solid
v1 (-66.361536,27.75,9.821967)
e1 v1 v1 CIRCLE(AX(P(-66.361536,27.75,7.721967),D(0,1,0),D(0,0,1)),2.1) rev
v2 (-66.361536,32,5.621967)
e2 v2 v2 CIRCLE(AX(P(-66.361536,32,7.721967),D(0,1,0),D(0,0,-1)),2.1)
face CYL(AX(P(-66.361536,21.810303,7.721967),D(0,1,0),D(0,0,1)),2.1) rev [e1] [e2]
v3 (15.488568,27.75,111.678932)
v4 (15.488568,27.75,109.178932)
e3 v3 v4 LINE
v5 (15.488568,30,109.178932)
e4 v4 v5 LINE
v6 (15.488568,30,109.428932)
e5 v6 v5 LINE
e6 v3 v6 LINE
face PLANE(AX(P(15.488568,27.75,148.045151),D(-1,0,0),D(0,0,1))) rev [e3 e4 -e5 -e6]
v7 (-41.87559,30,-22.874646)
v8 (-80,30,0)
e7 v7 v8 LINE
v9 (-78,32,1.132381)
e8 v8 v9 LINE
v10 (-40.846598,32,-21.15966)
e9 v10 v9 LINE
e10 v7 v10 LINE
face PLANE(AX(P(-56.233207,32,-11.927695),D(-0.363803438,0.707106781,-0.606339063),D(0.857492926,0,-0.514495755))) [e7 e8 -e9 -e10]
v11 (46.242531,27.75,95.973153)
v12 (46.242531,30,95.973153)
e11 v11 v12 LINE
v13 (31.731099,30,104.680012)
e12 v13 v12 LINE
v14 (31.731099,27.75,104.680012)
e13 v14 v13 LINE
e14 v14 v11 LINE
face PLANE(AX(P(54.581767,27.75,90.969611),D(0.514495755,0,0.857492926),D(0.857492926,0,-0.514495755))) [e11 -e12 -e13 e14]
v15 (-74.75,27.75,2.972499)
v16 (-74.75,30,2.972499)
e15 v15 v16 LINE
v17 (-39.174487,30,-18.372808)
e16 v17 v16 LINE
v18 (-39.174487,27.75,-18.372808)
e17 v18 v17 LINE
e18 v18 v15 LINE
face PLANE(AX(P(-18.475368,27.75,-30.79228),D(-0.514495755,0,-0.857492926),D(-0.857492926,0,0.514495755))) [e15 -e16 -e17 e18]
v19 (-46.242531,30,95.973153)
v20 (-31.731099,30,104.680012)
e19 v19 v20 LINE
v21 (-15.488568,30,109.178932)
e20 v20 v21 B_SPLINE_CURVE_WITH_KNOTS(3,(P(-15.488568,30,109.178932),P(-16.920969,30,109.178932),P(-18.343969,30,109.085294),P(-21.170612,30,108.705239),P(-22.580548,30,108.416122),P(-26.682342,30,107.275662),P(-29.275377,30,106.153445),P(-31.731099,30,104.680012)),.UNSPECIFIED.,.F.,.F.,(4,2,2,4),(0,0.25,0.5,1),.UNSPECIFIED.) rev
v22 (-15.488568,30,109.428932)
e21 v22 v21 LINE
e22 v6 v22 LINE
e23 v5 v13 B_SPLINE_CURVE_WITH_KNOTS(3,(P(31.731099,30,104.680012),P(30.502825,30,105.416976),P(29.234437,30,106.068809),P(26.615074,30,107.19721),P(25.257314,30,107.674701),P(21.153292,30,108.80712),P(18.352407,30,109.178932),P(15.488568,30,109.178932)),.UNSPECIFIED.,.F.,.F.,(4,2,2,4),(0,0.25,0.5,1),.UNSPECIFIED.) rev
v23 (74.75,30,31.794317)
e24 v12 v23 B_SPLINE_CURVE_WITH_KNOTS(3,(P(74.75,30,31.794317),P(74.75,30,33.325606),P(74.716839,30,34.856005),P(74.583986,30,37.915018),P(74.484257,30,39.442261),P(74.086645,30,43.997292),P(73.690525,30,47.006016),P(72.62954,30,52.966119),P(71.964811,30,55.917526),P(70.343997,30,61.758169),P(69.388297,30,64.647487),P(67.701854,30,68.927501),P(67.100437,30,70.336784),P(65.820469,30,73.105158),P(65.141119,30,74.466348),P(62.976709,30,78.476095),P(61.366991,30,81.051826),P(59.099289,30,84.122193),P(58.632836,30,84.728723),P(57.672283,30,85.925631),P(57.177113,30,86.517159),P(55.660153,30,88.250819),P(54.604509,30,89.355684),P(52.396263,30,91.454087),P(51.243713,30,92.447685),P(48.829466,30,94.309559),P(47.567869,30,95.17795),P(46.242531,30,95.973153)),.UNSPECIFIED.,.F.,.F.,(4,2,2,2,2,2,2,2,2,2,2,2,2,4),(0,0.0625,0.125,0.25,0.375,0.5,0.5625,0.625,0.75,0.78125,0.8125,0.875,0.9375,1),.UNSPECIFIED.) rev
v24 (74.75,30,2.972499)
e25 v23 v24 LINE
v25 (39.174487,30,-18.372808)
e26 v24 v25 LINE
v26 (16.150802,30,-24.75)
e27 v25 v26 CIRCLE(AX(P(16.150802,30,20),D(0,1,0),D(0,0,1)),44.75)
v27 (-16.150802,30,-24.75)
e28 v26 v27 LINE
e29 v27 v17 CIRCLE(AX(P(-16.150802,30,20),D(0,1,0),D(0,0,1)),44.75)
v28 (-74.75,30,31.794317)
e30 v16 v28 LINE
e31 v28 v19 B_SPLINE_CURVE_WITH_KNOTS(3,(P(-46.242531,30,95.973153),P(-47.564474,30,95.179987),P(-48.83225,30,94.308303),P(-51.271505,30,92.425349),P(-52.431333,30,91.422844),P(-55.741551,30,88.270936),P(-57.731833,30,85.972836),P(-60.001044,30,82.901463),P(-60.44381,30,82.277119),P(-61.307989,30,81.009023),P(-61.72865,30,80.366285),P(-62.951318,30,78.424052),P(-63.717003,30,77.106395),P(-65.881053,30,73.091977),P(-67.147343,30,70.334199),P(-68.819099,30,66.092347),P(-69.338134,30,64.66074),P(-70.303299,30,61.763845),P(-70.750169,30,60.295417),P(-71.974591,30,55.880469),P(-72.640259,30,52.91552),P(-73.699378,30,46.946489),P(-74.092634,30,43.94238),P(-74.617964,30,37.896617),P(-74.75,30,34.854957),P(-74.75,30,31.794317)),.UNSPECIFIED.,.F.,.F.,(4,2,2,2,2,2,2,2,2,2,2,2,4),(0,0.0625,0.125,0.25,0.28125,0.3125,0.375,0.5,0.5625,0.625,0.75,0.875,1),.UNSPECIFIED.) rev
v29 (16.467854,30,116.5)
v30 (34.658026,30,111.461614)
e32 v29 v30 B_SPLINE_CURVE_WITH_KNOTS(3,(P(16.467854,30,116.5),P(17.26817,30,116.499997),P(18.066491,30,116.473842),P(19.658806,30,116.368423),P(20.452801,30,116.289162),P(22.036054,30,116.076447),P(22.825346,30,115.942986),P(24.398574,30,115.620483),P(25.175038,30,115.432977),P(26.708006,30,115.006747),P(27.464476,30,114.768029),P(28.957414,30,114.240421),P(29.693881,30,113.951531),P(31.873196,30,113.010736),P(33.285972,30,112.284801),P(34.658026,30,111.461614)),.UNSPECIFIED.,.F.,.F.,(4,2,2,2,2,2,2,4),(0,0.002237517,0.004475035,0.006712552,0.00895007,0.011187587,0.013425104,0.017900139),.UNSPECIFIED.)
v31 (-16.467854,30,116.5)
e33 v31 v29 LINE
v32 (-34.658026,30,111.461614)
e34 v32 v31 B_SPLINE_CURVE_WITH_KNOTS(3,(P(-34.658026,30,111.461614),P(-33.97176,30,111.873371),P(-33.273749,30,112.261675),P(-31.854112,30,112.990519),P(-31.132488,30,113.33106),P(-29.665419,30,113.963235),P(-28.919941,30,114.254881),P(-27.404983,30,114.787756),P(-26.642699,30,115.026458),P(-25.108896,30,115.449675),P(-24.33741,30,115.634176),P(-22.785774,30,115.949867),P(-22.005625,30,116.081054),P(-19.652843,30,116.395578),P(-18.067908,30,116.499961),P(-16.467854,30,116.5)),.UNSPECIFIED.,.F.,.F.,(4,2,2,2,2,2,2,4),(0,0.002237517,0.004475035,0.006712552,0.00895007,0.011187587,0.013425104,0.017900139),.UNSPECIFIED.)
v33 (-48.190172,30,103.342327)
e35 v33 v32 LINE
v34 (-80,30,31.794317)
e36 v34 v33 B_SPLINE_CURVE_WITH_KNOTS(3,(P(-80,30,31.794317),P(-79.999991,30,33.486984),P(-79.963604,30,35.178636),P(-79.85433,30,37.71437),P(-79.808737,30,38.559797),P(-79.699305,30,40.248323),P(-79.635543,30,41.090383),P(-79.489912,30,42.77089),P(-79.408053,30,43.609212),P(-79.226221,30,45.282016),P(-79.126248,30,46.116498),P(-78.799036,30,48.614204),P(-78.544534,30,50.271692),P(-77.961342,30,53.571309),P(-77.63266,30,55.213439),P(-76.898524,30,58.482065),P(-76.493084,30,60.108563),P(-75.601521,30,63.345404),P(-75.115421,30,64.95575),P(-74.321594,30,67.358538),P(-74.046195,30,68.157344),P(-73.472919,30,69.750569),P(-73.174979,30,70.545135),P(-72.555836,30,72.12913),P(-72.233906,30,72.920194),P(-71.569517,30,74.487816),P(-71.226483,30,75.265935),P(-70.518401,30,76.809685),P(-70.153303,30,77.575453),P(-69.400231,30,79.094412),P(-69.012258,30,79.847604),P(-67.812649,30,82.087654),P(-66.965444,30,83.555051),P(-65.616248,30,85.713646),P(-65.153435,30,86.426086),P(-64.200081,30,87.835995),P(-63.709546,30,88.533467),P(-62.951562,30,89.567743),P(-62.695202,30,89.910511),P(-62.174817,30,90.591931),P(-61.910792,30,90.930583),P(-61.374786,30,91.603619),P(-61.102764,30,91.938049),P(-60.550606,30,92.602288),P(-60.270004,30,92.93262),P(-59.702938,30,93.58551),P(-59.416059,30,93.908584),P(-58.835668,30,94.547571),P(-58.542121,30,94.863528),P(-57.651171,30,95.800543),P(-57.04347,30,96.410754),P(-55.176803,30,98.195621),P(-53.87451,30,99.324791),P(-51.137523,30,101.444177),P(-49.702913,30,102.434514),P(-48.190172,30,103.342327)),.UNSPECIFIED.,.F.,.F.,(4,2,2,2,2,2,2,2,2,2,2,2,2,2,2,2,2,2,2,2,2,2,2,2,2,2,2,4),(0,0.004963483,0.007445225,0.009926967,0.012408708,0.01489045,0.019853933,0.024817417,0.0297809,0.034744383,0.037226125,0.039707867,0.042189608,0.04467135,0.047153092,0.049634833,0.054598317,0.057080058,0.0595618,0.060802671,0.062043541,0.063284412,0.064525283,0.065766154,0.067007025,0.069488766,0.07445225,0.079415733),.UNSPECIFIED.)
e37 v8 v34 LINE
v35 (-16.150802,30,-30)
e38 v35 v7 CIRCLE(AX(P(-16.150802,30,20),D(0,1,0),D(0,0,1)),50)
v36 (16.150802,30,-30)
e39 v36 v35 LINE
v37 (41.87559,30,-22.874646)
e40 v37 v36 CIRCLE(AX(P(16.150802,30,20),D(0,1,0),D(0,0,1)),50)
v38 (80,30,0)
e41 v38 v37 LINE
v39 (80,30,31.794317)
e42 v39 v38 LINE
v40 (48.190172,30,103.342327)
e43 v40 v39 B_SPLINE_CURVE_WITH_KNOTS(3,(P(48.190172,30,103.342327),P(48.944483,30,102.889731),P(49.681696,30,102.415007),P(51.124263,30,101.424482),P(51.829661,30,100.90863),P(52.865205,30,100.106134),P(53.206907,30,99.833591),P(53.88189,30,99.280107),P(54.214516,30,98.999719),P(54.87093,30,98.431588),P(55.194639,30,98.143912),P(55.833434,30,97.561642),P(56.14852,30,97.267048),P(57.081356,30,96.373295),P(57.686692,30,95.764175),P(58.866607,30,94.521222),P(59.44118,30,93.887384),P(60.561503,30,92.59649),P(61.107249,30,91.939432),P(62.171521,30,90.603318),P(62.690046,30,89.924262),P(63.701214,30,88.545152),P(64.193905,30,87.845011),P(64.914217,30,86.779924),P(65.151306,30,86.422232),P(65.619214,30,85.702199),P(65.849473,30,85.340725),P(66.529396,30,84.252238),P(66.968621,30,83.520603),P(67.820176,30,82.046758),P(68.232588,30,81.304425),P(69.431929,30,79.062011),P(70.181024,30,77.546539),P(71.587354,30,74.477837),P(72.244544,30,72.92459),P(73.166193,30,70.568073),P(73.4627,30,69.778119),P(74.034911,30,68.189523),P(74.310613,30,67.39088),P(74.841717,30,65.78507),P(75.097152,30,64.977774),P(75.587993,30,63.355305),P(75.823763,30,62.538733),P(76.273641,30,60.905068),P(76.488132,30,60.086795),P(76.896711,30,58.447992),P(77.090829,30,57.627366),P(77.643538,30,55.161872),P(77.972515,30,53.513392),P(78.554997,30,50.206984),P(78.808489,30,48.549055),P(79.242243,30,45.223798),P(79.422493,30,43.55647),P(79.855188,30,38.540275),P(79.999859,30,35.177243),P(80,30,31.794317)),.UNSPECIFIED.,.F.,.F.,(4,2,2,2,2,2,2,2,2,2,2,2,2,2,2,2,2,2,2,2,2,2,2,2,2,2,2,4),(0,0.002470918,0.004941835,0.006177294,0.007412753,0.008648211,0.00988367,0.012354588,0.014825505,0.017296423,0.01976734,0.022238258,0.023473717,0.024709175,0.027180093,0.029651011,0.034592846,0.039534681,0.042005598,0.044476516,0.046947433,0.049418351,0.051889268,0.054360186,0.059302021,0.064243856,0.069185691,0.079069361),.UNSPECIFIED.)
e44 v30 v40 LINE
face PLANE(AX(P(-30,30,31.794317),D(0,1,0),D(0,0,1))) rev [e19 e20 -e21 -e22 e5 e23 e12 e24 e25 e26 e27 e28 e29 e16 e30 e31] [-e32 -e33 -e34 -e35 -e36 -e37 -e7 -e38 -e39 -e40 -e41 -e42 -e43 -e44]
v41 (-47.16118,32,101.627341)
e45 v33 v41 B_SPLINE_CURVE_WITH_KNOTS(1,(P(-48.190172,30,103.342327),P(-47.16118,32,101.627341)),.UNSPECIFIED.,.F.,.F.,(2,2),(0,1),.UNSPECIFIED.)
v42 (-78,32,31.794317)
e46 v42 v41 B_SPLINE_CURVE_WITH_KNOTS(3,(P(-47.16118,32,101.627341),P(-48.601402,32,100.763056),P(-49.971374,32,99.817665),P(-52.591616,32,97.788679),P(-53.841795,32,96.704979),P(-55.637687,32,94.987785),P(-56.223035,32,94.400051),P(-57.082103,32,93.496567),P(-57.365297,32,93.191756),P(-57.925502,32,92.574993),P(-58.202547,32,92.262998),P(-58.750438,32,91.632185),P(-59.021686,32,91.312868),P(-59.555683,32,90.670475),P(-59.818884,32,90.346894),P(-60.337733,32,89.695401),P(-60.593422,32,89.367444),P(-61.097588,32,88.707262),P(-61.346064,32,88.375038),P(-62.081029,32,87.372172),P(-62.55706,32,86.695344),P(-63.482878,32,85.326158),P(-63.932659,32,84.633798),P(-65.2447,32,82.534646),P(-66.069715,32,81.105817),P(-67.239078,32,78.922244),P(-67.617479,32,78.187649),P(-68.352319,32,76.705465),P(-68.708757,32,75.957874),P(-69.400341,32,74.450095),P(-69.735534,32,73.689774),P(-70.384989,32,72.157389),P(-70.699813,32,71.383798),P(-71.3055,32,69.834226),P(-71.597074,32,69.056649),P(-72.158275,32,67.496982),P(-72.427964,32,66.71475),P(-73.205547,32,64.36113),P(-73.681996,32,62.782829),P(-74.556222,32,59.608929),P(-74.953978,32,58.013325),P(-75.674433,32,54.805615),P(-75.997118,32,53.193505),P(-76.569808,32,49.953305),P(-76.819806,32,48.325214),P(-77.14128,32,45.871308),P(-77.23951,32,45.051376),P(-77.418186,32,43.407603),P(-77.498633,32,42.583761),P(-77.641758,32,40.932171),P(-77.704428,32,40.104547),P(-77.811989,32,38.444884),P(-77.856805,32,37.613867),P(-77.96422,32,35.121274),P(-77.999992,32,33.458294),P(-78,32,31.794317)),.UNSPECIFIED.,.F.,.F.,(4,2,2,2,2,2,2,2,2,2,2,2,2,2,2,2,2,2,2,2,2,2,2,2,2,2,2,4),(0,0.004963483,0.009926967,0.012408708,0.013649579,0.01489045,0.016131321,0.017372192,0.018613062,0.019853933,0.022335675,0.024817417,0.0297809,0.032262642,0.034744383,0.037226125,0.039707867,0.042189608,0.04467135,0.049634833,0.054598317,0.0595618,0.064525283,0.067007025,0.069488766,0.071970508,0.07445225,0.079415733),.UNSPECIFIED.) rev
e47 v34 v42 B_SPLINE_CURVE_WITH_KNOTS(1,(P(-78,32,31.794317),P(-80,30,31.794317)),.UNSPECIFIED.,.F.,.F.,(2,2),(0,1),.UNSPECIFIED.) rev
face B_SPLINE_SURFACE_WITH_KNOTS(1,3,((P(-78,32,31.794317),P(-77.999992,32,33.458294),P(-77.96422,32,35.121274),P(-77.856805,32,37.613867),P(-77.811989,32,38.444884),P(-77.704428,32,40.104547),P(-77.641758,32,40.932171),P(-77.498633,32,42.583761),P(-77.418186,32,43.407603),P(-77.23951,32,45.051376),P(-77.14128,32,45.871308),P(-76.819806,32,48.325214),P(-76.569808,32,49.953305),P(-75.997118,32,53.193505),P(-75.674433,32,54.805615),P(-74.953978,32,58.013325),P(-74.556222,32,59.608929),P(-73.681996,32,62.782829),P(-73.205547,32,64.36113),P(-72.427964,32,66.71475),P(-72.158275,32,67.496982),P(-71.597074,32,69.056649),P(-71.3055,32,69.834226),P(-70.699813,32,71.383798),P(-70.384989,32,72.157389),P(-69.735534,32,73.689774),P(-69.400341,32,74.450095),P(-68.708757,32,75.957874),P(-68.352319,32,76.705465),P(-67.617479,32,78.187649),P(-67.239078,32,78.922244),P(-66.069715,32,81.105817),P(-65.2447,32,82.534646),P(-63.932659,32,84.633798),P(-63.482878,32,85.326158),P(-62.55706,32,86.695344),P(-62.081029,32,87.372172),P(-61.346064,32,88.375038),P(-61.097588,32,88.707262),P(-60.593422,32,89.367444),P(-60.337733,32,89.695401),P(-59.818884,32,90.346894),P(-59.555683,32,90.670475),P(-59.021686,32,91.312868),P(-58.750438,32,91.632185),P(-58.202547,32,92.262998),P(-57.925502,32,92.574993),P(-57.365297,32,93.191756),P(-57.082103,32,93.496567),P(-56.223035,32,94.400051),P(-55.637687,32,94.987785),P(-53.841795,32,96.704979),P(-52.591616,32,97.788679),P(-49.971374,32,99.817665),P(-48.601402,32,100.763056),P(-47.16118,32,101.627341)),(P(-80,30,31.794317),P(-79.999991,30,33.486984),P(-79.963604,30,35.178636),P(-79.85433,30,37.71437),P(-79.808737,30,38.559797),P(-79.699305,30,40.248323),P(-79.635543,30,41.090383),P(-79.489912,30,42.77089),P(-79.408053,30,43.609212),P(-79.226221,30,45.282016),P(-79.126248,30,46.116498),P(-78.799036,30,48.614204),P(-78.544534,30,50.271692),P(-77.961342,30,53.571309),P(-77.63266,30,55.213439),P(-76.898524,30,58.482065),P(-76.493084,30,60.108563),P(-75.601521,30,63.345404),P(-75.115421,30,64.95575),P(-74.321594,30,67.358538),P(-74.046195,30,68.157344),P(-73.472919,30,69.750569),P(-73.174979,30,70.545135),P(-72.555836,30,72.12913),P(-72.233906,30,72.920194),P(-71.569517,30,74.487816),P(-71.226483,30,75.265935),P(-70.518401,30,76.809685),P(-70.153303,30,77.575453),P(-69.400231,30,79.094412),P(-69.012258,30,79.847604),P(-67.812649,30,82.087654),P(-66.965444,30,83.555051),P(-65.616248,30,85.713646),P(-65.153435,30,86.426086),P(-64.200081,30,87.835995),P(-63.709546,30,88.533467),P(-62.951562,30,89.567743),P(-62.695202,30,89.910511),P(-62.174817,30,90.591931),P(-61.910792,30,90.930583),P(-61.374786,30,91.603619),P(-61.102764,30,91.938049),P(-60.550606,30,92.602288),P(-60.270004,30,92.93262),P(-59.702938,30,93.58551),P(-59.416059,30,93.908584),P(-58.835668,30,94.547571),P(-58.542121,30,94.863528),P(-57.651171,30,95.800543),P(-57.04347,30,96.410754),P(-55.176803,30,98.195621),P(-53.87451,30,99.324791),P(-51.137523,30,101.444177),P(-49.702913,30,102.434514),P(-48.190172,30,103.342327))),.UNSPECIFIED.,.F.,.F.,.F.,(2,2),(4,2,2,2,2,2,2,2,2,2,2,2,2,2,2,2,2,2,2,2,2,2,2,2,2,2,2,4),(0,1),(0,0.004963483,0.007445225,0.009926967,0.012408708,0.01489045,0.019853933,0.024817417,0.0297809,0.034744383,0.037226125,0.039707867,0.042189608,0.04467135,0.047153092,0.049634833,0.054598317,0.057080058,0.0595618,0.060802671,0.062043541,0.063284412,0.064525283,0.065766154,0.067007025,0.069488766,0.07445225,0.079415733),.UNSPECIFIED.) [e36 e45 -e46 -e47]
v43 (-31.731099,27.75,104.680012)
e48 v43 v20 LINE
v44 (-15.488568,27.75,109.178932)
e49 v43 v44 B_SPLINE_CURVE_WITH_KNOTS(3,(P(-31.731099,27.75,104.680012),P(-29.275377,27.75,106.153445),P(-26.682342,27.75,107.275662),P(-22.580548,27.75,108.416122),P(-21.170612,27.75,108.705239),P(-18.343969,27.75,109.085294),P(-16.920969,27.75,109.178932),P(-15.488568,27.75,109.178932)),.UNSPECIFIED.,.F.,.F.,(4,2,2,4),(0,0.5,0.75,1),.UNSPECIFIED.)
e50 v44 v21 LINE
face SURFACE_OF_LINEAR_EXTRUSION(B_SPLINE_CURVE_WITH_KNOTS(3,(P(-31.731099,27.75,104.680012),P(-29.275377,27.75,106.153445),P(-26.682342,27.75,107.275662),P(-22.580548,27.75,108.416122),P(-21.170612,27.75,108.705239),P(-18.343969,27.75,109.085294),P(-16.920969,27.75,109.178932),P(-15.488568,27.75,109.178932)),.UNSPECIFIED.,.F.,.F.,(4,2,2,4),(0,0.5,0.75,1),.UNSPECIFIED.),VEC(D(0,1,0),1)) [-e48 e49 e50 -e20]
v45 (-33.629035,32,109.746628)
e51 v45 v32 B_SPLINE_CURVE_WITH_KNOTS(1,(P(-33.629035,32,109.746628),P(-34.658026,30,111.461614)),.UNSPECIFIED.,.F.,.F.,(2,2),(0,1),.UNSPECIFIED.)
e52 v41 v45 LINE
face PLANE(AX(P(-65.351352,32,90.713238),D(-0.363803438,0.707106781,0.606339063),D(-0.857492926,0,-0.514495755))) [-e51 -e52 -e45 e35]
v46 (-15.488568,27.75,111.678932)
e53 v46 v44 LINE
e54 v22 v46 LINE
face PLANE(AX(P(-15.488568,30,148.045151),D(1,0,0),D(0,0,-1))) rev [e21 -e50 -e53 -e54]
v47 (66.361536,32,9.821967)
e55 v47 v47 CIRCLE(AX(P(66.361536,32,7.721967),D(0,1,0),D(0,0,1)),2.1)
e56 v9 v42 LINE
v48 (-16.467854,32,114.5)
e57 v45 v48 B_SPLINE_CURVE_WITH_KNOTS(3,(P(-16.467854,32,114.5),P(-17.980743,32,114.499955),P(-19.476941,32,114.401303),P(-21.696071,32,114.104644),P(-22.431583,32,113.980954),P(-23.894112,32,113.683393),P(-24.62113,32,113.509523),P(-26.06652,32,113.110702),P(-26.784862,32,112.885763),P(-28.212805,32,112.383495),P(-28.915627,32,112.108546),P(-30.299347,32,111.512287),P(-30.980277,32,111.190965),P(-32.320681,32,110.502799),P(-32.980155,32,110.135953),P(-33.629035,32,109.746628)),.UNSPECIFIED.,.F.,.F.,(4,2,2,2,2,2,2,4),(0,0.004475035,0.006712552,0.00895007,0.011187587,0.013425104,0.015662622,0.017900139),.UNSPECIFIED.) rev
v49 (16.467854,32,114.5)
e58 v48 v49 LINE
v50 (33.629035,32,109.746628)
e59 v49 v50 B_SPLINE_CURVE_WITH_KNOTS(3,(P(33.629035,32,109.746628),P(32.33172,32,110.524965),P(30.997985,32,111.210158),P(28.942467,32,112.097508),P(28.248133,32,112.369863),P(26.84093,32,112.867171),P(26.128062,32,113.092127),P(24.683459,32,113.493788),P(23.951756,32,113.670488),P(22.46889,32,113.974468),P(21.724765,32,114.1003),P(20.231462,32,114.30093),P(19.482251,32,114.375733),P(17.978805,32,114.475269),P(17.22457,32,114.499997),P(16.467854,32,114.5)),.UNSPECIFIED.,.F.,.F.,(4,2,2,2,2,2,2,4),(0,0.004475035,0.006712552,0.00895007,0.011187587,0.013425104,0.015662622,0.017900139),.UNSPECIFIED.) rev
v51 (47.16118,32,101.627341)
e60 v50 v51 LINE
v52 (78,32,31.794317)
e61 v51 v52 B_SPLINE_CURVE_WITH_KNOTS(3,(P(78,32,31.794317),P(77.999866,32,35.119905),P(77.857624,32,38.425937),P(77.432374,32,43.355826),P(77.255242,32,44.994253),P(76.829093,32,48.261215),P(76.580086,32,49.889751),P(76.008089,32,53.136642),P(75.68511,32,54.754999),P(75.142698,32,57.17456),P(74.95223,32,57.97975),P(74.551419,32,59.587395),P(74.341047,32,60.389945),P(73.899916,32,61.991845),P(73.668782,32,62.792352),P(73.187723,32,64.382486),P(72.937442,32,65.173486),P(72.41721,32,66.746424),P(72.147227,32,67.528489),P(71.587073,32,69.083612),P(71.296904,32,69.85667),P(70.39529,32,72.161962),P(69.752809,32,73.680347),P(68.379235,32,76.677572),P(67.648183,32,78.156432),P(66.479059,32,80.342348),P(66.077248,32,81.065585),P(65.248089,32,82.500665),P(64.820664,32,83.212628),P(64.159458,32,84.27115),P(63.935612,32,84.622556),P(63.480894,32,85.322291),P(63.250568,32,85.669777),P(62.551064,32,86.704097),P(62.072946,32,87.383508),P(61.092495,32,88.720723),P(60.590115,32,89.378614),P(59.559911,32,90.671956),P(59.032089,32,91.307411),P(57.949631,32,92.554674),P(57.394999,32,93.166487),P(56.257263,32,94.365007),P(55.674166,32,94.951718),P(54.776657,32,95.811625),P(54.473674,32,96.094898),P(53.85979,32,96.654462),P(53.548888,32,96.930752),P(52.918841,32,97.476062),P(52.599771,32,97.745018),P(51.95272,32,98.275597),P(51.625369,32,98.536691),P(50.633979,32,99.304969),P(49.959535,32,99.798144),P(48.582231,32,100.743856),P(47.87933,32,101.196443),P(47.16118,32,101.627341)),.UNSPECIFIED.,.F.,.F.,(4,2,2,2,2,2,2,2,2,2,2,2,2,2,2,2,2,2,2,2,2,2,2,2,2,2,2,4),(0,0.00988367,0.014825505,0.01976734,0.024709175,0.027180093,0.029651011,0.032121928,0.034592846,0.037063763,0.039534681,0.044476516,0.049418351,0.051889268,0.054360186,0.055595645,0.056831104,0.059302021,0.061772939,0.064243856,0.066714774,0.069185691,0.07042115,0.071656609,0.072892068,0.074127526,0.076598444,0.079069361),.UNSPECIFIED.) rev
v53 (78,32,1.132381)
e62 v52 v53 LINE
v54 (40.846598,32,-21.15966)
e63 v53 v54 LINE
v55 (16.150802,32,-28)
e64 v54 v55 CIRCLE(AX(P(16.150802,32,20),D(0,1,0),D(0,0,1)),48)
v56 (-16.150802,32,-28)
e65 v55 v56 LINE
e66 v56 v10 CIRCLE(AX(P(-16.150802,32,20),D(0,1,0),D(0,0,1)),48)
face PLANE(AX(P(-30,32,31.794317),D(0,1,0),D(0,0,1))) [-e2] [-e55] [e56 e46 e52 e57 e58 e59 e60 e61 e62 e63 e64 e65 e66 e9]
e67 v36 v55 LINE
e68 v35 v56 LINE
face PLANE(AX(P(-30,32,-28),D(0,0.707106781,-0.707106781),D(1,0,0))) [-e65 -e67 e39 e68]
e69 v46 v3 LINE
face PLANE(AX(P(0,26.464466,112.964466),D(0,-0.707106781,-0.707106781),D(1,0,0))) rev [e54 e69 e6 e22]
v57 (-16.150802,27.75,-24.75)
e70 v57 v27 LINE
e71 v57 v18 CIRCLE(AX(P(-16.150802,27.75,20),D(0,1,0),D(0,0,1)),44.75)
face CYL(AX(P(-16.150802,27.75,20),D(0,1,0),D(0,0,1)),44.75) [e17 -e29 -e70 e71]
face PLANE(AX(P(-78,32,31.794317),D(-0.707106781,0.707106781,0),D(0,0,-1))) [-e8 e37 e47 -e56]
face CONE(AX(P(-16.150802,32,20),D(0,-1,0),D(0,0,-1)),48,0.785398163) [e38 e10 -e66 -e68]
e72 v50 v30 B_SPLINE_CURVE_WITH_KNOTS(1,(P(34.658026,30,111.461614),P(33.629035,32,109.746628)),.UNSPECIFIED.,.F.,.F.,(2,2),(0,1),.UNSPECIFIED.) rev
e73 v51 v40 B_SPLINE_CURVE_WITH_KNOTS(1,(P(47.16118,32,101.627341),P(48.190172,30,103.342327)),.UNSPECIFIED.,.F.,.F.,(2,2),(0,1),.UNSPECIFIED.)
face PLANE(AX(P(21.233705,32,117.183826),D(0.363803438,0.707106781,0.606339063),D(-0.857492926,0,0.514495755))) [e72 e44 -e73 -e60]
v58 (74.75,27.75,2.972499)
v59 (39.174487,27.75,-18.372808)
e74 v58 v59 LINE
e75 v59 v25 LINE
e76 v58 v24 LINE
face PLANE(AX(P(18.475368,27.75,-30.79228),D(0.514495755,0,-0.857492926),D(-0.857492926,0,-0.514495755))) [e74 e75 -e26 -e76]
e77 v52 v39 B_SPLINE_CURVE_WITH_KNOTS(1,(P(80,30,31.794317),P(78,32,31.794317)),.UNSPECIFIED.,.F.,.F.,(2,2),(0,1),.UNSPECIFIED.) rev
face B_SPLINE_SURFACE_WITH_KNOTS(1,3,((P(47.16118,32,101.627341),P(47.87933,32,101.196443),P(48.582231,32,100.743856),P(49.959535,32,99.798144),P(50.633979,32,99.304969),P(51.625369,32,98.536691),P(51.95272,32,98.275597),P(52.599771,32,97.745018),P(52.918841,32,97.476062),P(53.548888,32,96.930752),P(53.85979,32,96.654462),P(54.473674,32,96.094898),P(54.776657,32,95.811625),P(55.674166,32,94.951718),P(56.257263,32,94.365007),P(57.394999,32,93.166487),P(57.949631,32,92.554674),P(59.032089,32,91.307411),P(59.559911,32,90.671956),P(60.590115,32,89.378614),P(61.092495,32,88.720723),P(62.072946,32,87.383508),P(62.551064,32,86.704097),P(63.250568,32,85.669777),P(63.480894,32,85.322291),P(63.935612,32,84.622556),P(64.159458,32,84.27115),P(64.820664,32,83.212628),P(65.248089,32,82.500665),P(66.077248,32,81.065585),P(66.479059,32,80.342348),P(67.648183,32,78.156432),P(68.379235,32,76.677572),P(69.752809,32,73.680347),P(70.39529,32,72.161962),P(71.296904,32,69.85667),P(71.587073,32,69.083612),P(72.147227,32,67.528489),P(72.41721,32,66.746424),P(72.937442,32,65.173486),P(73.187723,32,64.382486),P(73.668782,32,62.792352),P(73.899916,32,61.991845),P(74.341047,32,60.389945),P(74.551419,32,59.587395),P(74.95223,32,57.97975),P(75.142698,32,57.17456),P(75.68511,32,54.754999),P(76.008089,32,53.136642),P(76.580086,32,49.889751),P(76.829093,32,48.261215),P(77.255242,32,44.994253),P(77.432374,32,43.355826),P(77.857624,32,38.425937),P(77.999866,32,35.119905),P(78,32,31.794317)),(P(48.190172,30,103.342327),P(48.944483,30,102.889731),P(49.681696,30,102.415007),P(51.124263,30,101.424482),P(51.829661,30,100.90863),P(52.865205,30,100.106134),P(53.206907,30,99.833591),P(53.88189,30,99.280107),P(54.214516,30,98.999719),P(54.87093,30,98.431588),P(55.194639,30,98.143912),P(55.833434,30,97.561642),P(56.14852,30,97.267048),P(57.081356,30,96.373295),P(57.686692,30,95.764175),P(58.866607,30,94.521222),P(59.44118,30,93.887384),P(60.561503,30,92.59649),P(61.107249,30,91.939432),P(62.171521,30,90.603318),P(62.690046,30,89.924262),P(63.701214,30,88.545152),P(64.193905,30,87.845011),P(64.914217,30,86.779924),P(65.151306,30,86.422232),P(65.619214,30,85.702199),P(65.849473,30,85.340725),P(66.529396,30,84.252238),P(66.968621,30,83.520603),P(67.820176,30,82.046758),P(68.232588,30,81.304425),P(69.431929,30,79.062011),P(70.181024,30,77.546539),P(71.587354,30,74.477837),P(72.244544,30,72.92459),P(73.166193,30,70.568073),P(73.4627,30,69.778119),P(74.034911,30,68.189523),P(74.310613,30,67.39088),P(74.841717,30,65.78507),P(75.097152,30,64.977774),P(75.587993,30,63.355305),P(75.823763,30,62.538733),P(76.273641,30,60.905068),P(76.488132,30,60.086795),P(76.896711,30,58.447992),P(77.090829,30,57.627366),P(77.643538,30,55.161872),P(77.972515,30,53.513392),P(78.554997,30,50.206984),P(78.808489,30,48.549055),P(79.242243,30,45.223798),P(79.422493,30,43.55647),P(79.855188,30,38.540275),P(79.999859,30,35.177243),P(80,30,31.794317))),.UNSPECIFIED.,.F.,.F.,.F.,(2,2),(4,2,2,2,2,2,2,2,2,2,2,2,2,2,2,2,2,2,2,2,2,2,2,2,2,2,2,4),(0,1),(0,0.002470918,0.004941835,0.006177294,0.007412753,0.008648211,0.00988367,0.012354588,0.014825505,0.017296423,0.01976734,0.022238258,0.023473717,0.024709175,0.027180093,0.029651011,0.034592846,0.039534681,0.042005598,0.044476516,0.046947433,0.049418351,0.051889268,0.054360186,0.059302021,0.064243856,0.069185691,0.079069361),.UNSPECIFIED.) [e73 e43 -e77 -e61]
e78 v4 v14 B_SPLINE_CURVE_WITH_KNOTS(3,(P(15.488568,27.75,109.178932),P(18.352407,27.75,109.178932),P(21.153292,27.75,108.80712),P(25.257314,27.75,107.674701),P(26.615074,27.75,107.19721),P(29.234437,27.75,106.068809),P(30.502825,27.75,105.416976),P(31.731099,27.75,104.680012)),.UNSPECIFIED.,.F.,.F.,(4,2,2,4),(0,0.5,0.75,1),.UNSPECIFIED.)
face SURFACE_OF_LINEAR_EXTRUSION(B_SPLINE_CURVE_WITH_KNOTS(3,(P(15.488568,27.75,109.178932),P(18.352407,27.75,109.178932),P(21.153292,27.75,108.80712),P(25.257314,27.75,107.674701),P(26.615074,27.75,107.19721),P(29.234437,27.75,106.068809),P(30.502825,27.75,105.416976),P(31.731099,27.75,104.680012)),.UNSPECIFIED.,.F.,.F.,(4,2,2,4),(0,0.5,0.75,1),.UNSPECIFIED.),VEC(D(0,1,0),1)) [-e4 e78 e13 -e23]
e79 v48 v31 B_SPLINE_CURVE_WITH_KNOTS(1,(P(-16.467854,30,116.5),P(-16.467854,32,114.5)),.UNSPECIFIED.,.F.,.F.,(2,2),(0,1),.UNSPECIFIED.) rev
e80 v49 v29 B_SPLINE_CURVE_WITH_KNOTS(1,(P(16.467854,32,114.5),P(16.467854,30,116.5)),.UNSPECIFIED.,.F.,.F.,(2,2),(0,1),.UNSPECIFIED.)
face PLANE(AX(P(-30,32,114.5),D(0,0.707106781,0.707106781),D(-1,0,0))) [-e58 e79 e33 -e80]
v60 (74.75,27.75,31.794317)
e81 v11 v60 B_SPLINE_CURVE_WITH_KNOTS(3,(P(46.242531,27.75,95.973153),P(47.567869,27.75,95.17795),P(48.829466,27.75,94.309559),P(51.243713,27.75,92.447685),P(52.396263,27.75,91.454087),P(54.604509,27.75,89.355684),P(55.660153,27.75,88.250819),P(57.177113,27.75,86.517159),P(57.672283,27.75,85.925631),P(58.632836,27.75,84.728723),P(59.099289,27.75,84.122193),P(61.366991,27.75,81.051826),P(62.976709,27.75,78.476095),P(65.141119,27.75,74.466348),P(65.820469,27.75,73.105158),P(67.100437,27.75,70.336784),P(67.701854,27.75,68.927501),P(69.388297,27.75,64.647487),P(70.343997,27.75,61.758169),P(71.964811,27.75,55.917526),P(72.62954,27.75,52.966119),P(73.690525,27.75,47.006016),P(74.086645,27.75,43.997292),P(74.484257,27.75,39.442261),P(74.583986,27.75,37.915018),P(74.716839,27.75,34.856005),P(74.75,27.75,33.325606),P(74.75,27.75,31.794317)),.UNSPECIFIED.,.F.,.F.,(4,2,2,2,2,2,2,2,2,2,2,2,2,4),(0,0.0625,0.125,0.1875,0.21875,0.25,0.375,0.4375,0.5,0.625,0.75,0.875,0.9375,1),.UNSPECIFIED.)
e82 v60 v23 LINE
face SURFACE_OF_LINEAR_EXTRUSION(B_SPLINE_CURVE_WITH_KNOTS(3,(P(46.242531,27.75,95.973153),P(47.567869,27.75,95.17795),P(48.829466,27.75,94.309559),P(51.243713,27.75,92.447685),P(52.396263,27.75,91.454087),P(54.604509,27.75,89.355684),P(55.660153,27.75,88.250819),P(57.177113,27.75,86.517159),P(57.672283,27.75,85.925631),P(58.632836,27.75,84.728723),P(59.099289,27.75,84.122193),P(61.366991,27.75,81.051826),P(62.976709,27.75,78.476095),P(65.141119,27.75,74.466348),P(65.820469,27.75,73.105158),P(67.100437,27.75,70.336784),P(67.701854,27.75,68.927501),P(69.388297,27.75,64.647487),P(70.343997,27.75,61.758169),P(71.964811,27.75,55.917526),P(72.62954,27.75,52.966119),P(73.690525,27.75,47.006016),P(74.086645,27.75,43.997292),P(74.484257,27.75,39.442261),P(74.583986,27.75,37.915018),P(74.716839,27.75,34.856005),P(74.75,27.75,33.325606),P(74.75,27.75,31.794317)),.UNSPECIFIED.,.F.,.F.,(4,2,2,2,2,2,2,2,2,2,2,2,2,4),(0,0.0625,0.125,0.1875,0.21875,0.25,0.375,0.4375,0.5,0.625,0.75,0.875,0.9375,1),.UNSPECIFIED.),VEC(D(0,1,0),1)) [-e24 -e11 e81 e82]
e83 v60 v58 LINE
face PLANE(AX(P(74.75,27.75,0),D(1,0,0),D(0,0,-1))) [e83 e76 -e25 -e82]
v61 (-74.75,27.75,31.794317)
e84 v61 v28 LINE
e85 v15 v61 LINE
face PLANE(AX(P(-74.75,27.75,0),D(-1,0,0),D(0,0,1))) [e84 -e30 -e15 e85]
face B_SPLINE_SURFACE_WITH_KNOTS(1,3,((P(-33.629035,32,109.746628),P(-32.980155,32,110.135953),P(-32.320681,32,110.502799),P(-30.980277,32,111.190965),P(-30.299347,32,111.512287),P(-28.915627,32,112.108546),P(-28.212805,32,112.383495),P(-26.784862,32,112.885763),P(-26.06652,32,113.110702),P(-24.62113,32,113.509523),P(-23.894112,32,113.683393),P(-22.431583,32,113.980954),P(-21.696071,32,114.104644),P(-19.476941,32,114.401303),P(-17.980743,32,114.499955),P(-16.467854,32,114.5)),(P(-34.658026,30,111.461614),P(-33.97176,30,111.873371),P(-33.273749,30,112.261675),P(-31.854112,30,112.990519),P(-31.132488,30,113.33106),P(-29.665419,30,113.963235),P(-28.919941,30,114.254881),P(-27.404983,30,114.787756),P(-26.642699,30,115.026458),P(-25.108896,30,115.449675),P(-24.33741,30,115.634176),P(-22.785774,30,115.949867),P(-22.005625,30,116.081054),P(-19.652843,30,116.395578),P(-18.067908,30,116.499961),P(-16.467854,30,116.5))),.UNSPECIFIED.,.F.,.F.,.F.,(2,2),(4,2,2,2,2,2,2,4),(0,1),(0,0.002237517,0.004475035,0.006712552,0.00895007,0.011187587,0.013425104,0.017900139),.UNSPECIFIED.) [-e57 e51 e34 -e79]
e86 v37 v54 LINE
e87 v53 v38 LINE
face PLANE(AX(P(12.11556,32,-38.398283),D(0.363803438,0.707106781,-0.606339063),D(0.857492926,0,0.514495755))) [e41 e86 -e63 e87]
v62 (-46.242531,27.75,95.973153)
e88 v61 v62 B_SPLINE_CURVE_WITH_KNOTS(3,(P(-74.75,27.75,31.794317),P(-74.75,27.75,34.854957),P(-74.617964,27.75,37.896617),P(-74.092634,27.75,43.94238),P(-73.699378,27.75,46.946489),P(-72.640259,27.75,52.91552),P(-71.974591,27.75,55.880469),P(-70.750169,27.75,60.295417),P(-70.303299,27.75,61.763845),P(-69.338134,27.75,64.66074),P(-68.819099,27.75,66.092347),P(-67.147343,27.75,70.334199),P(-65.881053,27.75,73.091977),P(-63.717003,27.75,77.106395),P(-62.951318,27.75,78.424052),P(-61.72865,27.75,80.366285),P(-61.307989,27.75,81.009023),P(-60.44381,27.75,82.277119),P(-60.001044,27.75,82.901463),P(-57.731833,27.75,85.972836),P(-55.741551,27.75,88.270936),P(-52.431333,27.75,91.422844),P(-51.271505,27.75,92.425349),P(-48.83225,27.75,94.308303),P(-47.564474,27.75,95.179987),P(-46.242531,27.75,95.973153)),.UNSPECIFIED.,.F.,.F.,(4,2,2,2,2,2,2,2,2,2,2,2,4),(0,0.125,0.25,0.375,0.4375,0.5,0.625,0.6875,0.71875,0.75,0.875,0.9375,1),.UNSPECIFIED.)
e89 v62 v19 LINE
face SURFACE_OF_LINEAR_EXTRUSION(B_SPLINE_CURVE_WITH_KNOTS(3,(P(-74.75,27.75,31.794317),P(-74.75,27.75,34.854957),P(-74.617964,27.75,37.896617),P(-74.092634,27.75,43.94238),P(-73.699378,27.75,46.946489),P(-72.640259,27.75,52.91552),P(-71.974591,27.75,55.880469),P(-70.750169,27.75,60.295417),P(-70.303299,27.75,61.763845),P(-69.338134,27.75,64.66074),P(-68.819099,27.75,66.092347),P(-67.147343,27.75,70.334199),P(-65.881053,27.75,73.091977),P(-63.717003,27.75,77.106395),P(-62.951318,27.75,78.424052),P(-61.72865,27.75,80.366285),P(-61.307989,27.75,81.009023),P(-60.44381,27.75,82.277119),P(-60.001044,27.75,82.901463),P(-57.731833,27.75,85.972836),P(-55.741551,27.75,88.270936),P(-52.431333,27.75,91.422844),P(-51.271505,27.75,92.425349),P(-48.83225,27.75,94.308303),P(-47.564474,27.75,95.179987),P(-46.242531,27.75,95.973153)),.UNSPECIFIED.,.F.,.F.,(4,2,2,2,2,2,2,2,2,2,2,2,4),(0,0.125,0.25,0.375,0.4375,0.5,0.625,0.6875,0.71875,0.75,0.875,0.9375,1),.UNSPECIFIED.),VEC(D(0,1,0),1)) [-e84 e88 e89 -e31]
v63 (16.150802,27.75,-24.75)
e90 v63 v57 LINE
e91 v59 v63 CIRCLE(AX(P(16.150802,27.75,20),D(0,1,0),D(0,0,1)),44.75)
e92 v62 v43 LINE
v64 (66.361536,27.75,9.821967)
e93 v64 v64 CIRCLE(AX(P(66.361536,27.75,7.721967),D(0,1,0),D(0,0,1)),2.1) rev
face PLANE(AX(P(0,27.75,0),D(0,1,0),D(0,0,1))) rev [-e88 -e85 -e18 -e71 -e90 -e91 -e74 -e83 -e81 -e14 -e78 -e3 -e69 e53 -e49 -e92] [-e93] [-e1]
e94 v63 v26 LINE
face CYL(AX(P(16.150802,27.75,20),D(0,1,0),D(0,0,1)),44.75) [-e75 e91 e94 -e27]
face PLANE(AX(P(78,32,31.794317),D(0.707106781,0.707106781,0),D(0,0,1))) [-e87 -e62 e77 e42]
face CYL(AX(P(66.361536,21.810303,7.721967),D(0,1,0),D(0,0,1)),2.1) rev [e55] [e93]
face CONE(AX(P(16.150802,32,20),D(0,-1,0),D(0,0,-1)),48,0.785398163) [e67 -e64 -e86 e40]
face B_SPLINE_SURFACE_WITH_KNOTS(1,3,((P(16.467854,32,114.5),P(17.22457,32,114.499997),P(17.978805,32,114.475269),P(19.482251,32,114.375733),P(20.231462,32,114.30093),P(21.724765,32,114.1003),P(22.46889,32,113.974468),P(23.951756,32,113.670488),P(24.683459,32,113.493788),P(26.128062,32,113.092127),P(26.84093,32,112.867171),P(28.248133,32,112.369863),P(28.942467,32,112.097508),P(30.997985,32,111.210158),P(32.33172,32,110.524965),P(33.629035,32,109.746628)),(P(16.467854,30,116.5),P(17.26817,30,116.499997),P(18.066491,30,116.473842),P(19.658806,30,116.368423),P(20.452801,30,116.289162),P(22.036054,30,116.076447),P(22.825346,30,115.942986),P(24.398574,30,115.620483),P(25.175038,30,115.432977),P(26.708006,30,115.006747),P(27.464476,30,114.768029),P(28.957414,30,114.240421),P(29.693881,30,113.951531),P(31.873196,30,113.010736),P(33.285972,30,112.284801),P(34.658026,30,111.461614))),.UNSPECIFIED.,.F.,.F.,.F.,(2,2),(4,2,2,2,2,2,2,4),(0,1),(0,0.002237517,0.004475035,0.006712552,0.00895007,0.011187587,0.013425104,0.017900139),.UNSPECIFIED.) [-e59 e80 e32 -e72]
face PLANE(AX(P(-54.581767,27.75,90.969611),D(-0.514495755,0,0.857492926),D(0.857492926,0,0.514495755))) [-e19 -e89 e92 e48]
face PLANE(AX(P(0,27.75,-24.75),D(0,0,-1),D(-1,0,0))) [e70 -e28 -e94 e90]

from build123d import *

# Parameters (mm, degrees)
BOSS_EXTRUDE1_DEPTH = 2.25
BOSS_EXTRUDE2_DEPTH = 2
CHAMFER1_SIZE       = 2
SKETCH2_R           = 2.1
CUT_EXTRUDE3_DEPTH  = 4.25
BOSS_EXTRUDE3_REACH = 165.691
SKETCH4_W           = 30.977136558
SKETCH4_H           = 2.25


with BuildPart() as part:
    # Sketch1 → Boss-Extrude1 (new body)
    with BuildSketch(Plane(origin=(0, 30, 0), x_dir=(1, 0, 0), z_dir=(0, 1, 0))):
        with BuildLine():
            Line((16.150801753, 24.75), (-16.150801753, 24.75))
            ThreePointArc((-16.150801753, 24.75), (-28.096079542, 23.126243037), (-39.174486808, 18.372808426))
            Line((-39.174486808, 18.372808426), (-74.75, -2.97249949))
            Line((-74.75, -2.97249949), (-74.75, -31.794317372))
            add(Edge.make_bspline(
                [(-74.75, -31.794317372), (-74.75, -34.854957393), (-74.617964132, -37.896617098), (-74.092634279, -43.942380332), (-73.699378084, -46.946489294), (-72.640258958, -52.915519667), (-71.97459072, -55.880469065), (-70.750169489, -60.295417047), (-70.303298869, -61.763844969), (-69.338133577, -64.660739638), (-68.819099262, -66.092346674), (-67.147343369, -70.334199296), (-65.881052999, -73.091977263), (-63.717003155, -77.10639512), (-62.951317542, -78.424051782), (-61.728649984, -80.366285253), (-61.307989229, -81.009022825), (-60.443810311, -82.277119387), (-60.001044485, -82.901462706), (-57.731833326, -85.972836279), (-55.741550679, -88.270936188), (-52.431333352, -91.422844474), (-51.271504838, -92.425348837), (-48.832250491, -94.308303199), (-47.564474204, -95.179986516), (-46.242530751, -95.973152587)],
                knots=[0, 0, 0, 0, 0.125, 0.125, 0.25, 0.25, 0.375, 0.375, 0.4375, 0.4375, 0.5, 0.5, 0.625, 0.625, 0.6875, 0.6875, 0.71875, 0.71875, 0.75, 0.75, 0.875, 0.875, 0.9375, 0.9375, 1, 1, 1, 1], degree=3))
            Line((-46.242530751, -95.973152587), (-31.73109903, -104.68001162))
            add(Edge.make_bspline(
                [(-31.73109903, -104.68001162), (-29.275377335, -106.153444637), (-26.68234242, -107.275661914), (-22.580548307, -108.4161221), (-21.170611667, -108.705239228), (-18.343968581, -109.085294073), (-16.920969223, -109.178932188), (-15.488568279, -109.178932188)],
                knots=[0, 0, 0, 0, 0.5, 0.5, 0.75, 0.75, 1, 1, 1, 1], degree=3))
            Line((-15.488568279, -109.178932188), (15.488568279, -109.178932188))
            add(Edge.make_bspline(
                [(15.488568279, -109.178932188), (18.352407294, -109.178932188), (21.153292414, -108.807120107), (25.257313775, -107.674700988), (26.615074004, -107.197210462), (29.234437058, -106.068808934), (30.502825354, -105.416975826), (31.73109903, -104.68001162)],
                knots=[0, 0, 0, 0, 0.5, 0.5, 0.75, 0.75, 1, 1, 1, 1], degree=3))
            Line((31.73109903, -104.68001162), (46.242530751, -95.973152587))
            add(Edge.make_bspline(
                [(46.242530751, -95.973152587), (47.567869145, -95.177949551), (48.829466075, -94.309558847), (51.243712939, -92.447684976), (52.396262721, -91.454086815), (54.604509349, -89.355684378), (55.660153085, -88.25081912), (57.177112794, -86.517159458), (57.67228307, -85.925631056), (58.63283622, -84.728723238), (59.099288908, -84.122193289), (61.366991068, -81.05182626), (62.976708922, -78.476094674), (65.141118903, -74.466347585), (65.820469131, -73.105158474), (67.100436526, -70.336783684), (67.701854467, -68.927501042), (69.388296968, -64.647487304), (70.343996758, -61.758169069), (71.964810988, -55.917525955), (72.629539561, -52.966118736), (73.690525283, -47.006016439), (74.086644723, -43.997291976), (74.484256509, -39.442260691), (74.583986383, -37.915017565), (74.716839481, -34.856005184), (74.75, -33.325606239), (74.75, -31.794317372)],
                knots=[0, 0, 0, 0, 0.0625, 0.0625, 0.125, 0.125, 0.1875, 0.1875, 0.21875, 0.21875, 0.25, 0.25, 0.375, 0.375, 0.4375, 0.4375, 0.5, 0.5, 0.625, 0.625, 0.75, 0.75, 0.875, 0.875, 0.9375, 0.9375, 1, 1, 1, 1], degree=3))
            Line((74.75, -31.794317372), (74.75, -2.97249949))
            Line((74.75, -2.97249949), (39.174486808, 18.372808426))
            ThreePointArc((39.174486808, 18.372808426), (28.096079542, 23.126243037), (16.150801753, 24.75))
        make_face()
    extrude(amount=-BOSS_EXTRUDE1_DEPTH)

    # Sketch3 → Boss-Extrude2 (add)
    with BuildSketch(Plane(origin=(0, 30, 0), x_dir=(1, 0, 0), z_dir=(0, 1, 0))):
        with BuildLine():
            Line((16.150801753, 30), (-16.150801753, 30))
            ThreePointArc((-16.150801753, 30), (-29.497480847, 28.185746411), (-41.875589524, 22.874646286))
            Line((-41.875589524, 22.874646286), (-80, 0))
            Line((-80, 0), (-80, -31.794317372))
            add(Edge.make_bspline(
                [(-80, -31.794317372), (-80, -84.256429884), (-48.190171878, -103.342326757)],
                knots=[1.570796327, 1.570796327, 1.570796327, 2.769244761, 2.769244761, 2.769244761], degree=2, weights=[1, 0.825773406, 1]))
            Line((-48.190171878, -103.342326757), (-34.658026356, -111.46161407))
            add(Edge.make_bspline(
                [(-34.658026356, -111.46161407), (-26.260716473, -116.5), (-16.467854478, -116.5)],
                knots=[6.093295641, 6.093295641, 6.093295641, 6.473074974, 6.473074974, 6.473074974], degree=2, weights=[1, 0.982025067, 1]))
            Line((-16.467854478, -116.5), (16.467854478, -116.5))
            add(Edge.make_bspline(
                [(16.467854478, -116.5), (26.260716473, -116.5), (34.658026356, -111.46161407)],
                knots=[6.093295641, 6.093295641, 6.093295641, 6.473074974, 6.473074974, 6.473074974], degree=2, weights=[1, 0.982025067, 1]))
            Line((34.658026356, -111.46161407), (48.190171878, -103.342326757))
            add(Edge.make_bspline(
                [(48.190171878, -103.342326757), (80, -84.256429884), (80, -31.794317372)],
                knots=[0.372347892, 0.372347892, 0.372347892, 1.570796327, 1.570796327, 1.570796327], degree=2, weights=[1, 0.825773406, 1]))
            Line((80, -31.794317372), (80, 0))
            Line((80, 0), (41.875589524, 22.874646286))
            ThreePointArc((41.875589524, 22.874646286), (29.497480847, 28.185746411), (16.150801753, 30))
        make_face()
    extrude(amount=BOSS_EXTRUDE2_DEPTH)

    # Chamfer1
    chamfer1_edges = [part.edges().sort_by_distance(p)[0] for p in [
        (60.937794762, 32, -11.437323143),
        (80, 32, 15.897158686),
        (71.288670322, 32, 75.11613473),
        (41.424099117, 32, 107.401970414),
        (25.908664389, 32, 115.22898027),
        (0, 32, 116.5),
        (-25.908664389, 32, 115.22898027),
        (-41.424099117, 32, 107.401970414),
        (-71.288670322, 32, 75.11613473),
        (-80, 32, 15.897158686),
        (-60.937794762, 32, -11.437323143),
        (-29.497480847, 32, -28.185746411),
        (0, 32, -30),
        (29.497480847, 32, -28.185746411),
    ]]
    chamfer(chamfer1_edges, length=CHAMFER1_SIZE - 0.0001)  # a hair under: the kernel refuses the full size

    # Sketch2 → Cut-Extrude3 (cut)
    with BuildSketch(Plane(origin=(0, 32, 0), x_dir=(1, 0, 0), z_dir=(0, 1, 0))):
        with Locations(Location((66.361535838, -7.721967193, 0), (0, 0, 270))):
            Circle(SKETCH2_R)
        with Locations(Location((-66.361535838, -7.721967193, 0), (0, 0, 270))):
            Circle(SKETCH2_R)
    extrude(amount=-CUT_EXTRUDE3_DEPTH, mode=Mode.SUBTRACT)

    # Boss-Extrude3: up to this plane
    boss_extrude3_end = Plane(origin=(0, 26.464466094, 112.964466094), z_dir=(0, -0.7071067811865458, -0.7071067811865493))
    # Sketch4 → Boss-Extrude3 (add, up to the surface)
    with BuildSketch(Plane.XY.offset(109.178932188), mode=Mode.PRIVATE) as boss_extrude3_sk1:
        with Locations((0, 28.875)):
            Rectangle(SKETCH4_W, SKETCH4_H)
    boss_extrude3_tool1 = split(extrude(boss_extrude3_sk1.sketch, amount=BOSS_EXTRUDE3_REACH, mode=Mode.PRIVATE), bisect_by=boss_extrude3_end, keep=Keep.BOTH, mode=Mode.PRIVATE)
    add(boss_extrude3_tool1.solids().sort_by_distance((0, 28.875, 109.178932))[0])


solid = part.part
